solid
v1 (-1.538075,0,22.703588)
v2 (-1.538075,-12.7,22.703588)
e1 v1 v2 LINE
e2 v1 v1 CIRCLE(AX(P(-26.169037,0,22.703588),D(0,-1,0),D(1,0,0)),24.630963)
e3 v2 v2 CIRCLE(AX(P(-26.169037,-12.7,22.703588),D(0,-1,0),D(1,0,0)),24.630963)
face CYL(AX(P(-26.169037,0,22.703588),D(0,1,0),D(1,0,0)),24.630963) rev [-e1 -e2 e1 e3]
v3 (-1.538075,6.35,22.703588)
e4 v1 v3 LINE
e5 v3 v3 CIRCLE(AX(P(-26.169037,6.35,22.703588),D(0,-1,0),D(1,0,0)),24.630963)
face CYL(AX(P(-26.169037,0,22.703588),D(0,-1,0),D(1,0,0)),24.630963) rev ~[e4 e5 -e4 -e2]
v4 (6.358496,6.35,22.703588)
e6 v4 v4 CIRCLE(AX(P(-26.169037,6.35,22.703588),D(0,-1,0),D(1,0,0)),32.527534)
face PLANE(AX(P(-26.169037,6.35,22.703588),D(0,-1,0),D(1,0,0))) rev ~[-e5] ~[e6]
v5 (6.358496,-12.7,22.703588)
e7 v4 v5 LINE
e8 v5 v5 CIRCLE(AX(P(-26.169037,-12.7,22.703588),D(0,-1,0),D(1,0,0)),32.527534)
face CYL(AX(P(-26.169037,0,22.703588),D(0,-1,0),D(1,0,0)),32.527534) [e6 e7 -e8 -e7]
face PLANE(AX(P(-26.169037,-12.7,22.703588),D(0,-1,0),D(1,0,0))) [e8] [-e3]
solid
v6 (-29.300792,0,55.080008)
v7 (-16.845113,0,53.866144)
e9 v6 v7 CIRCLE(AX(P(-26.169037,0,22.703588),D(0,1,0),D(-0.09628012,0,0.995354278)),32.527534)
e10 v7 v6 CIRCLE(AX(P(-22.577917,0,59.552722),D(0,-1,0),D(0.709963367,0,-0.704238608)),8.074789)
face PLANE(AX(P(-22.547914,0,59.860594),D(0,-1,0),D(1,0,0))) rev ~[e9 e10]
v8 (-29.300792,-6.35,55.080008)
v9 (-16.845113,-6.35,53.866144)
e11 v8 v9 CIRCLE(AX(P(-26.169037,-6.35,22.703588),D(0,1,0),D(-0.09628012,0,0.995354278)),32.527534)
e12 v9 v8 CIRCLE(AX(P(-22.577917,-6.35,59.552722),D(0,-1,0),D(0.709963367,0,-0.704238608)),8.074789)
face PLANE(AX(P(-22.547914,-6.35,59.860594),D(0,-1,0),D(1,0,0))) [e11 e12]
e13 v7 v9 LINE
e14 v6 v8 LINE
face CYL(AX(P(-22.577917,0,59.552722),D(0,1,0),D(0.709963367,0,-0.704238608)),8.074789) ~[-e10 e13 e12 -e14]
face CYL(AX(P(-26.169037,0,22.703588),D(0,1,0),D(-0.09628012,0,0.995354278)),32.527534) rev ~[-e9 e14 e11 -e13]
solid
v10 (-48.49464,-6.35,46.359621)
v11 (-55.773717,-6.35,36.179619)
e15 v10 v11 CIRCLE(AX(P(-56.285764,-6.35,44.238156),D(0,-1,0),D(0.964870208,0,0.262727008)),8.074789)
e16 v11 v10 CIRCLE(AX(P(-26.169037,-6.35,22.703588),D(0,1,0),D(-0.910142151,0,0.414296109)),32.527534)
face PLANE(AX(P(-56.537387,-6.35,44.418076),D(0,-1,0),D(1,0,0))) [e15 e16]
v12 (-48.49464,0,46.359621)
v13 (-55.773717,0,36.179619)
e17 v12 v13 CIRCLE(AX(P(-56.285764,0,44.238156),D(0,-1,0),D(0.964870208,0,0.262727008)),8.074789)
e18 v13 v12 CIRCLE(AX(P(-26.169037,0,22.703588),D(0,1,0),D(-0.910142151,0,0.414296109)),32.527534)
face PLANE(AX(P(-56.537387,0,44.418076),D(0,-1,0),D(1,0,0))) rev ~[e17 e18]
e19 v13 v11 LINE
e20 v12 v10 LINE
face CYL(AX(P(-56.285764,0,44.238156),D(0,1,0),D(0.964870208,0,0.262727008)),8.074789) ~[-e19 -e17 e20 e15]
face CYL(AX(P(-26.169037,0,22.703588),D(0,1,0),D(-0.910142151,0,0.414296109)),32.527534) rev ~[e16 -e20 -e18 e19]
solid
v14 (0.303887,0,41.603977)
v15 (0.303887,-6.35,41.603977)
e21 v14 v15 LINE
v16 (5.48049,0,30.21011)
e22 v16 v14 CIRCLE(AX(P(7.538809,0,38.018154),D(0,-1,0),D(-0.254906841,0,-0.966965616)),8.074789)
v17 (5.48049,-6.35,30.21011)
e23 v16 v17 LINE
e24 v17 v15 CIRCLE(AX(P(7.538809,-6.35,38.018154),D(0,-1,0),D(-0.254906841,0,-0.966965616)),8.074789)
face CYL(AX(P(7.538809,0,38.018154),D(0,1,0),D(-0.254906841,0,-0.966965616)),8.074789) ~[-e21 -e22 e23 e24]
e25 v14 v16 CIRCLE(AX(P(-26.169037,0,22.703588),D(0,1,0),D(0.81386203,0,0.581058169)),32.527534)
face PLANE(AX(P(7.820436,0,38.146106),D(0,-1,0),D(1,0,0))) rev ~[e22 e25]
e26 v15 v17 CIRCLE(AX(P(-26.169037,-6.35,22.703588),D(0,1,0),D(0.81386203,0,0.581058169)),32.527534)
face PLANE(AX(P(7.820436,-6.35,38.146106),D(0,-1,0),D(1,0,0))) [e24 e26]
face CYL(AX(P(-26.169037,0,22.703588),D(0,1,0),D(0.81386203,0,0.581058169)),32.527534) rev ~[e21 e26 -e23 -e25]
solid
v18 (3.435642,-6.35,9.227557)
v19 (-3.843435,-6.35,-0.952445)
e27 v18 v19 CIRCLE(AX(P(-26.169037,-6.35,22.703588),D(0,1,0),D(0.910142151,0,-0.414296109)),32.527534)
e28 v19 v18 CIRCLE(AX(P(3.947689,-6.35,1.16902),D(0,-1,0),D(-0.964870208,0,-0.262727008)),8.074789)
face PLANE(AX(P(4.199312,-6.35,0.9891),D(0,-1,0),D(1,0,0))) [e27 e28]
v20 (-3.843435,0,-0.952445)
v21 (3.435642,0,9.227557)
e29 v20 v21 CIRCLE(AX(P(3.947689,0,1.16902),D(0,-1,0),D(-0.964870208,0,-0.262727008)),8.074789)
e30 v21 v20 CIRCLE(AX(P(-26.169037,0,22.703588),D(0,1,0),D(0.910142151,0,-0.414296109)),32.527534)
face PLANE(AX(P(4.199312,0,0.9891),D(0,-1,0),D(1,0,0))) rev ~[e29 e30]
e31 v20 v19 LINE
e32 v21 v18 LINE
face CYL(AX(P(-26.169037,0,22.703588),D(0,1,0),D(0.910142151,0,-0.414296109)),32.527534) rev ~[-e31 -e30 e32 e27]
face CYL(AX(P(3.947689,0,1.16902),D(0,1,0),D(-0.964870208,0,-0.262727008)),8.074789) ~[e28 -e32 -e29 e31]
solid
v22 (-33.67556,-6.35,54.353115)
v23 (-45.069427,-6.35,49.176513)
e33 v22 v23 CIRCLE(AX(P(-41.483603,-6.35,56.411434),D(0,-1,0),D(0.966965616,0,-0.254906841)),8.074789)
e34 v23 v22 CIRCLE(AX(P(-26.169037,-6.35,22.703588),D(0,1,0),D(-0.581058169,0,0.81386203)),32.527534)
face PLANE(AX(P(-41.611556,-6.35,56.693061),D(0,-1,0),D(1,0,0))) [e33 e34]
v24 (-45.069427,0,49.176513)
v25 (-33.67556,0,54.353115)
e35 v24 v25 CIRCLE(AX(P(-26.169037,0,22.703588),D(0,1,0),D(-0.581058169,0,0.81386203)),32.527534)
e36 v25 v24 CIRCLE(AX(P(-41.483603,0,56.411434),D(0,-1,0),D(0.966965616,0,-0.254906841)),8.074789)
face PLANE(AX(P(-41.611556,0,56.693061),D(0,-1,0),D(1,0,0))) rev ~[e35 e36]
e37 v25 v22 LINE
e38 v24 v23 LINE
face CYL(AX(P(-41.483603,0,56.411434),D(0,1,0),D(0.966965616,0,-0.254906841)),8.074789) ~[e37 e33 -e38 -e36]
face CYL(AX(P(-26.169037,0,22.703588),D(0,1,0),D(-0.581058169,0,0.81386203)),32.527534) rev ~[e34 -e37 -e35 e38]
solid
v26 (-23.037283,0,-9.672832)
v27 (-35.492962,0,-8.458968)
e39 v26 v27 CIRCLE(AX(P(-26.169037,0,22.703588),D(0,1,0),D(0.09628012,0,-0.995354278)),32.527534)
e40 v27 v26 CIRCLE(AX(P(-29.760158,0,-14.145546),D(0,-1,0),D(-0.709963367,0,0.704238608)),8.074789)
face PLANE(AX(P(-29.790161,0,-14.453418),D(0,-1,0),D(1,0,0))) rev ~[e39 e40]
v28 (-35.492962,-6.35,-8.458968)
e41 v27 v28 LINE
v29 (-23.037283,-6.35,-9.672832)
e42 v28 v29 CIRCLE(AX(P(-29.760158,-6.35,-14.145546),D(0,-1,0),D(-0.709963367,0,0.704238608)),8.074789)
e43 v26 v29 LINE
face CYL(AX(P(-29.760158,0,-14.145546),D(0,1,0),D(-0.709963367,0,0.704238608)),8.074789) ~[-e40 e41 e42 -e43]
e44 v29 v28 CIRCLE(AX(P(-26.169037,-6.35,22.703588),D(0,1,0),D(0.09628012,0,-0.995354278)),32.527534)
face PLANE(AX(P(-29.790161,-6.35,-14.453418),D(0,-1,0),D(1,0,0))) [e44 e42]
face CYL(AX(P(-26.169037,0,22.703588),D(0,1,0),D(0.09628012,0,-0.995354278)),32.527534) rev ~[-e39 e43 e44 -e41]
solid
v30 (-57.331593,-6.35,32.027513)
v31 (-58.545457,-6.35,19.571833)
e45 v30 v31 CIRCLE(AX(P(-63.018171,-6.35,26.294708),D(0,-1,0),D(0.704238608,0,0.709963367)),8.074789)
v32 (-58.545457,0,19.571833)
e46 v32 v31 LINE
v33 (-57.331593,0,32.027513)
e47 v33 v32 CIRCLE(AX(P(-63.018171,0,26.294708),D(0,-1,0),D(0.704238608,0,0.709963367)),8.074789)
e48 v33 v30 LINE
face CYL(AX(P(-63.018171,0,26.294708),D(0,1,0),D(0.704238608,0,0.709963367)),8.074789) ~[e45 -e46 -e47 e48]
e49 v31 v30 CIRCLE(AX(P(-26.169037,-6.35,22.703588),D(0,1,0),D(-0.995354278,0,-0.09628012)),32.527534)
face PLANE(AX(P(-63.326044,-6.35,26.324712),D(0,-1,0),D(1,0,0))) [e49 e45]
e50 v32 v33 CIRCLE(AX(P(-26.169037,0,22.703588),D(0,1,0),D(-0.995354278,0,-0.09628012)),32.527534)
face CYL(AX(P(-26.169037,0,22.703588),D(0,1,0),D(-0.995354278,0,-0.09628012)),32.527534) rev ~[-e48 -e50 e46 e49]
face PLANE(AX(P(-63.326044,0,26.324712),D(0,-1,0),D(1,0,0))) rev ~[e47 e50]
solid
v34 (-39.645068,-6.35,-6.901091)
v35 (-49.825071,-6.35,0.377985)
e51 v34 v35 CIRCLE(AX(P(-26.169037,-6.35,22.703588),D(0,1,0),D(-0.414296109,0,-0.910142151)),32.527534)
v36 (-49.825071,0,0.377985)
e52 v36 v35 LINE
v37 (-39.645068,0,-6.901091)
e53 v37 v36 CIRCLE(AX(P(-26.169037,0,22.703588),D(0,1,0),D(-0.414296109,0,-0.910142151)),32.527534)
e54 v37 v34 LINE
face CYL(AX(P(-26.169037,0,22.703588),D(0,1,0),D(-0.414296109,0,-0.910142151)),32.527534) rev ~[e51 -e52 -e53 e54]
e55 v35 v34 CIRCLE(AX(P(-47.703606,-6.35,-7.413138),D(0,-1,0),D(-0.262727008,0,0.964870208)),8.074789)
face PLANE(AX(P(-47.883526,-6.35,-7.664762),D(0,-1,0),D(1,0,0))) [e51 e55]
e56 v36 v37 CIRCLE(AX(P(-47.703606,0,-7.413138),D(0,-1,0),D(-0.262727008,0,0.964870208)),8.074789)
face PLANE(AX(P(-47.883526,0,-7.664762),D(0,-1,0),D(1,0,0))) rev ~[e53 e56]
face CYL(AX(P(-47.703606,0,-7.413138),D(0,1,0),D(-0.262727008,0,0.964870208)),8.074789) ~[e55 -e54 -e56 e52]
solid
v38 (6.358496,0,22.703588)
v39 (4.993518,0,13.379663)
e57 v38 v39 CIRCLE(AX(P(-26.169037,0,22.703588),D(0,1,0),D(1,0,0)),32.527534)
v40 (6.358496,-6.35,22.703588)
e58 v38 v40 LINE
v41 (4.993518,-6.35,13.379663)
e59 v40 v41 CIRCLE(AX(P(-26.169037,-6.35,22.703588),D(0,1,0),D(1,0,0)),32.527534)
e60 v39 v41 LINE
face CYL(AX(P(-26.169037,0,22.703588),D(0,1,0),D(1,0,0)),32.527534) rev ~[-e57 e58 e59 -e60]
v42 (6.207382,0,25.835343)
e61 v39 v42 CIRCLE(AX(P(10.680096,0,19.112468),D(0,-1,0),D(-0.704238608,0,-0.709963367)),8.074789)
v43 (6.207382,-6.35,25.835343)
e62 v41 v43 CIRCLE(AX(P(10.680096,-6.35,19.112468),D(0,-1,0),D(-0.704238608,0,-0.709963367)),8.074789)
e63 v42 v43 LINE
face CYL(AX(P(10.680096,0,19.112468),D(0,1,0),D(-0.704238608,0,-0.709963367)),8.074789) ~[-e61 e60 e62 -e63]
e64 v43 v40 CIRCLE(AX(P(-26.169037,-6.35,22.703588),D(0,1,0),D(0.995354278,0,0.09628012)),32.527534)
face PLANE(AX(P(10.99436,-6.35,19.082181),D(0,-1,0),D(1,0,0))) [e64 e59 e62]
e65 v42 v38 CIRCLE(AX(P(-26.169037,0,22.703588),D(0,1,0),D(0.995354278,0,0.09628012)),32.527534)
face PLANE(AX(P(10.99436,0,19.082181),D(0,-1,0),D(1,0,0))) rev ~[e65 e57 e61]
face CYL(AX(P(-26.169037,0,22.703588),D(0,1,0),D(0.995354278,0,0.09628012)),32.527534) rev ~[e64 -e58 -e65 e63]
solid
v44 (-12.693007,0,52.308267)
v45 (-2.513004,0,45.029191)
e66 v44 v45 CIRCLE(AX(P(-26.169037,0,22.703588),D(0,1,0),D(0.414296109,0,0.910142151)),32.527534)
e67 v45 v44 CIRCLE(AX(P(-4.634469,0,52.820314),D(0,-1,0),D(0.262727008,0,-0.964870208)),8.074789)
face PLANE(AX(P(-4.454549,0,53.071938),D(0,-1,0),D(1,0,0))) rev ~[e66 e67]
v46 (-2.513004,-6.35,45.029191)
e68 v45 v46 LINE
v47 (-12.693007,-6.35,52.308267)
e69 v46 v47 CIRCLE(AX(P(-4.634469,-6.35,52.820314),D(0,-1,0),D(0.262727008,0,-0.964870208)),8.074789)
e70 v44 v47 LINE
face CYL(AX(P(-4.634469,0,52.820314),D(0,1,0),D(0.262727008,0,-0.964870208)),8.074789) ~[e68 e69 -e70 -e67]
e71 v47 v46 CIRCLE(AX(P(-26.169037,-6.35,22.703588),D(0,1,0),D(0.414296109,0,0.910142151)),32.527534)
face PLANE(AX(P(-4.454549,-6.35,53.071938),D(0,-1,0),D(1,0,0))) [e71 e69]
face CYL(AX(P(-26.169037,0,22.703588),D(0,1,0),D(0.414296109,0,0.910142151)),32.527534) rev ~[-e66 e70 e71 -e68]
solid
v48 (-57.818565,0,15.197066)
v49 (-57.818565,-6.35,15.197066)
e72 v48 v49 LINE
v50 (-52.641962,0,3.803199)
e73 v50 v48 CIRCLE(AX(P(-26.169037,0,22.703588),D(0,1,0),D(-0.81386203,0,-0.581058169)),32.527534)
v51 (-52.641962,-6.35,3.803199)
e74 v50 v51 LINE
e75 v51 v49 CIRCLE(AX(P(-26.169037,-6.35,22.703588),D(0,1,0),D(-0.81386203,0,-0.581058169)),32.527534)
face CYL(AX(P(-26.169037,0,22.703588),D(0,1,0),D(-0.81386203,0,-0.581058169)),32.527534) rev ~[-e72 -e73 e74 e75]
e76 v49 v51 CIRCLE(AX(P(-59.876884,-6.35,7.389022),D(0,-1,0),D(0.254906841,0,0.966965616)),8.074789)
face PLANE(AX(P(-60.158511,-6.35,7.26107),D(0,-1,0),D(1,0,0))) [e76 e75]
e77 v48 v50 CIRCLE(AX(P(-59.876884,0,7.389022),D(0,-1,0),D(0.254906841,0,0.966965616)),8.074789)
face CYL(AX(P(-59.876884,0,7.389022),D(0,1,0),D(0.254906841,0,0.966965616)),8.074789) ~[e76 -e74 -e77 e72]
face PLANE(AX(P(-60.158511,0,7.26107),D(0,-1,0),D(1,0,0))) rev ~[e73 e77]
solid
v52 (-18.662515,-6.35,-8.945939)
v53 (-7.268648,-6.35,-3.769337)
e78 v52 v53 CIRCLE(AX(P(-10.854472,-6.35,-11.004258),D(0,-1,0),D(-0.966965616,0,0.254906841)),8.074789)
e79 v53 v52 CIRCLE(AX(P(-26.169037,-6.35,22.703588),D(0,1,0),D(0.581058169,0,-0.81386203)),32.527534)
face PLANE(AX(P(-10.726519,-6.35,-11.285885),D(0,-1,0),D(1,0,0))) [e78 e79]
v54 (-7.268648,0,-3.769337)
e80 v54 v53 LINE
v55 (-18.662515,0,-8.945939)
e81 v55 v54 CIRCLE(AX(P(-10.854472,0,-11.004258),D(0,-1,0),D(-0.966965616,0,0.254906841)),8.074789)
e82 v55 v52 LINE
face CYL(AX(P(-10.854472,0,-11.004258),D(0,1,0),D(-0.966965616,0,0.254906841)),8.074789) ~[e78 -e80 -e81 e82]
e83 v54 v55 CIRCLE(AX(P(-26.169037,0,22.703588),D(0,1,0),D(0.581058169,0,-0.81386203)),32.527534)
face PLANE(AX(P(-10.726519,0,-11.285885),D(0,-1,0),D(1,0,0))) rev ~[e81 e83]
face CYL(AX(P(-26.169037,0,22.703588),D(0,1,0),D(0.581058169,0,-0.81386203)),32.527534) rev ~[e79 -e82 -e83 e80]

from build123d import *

# Parameters (mm, degrees)
F3_DEPTH      = 6.35
F4_R          = 32.5275336584
F4_R_2        = 24.6309625536
F5_DEPTH      = 12.7
F5_DEPTH_BACK = 6.35


# Not quite as in the source:
# - the program builds the solid bodies; features that only make, move or delete a surface that nothing else refers to are left out


with BuildPart() as f3:
    # F2 (on Front) → F3 (new body)
    with BuildSketch(Plane.XZ):
        with BuildLine():
            ThreePointArc((-57.3315931421, 32.0275125267), (-71.0548866609, 27.0779234756), (-58.5454572214, 19.5718331568))
            ThreePointArc((-58.5454572214, 19.5718331568), (-58.5431990279, 25.8586011297), (-57.3315931421, 32.0275125267))
        make_face()
    extrude(amount=F3_DEPTH)


with BuildPart() as f3b:
    # F2 (on Front) → F3, piece 2 (new body)
    with BuildSketch(Plane.XZ):
        with BuildLine():
            ThreePointArc((-48.4946400668, 46.3596213521), (-62.8541554032, 48.934798255), (-55.7737168812, 36.179618636))
            ThreePointArc((-55.7737168812, 36.179618636), (-52.6283772418, 41.6229903116), (-48.4946400668, 46.3596213521))
        make_face()
    extrude(amount=F3_DEPTH)


with BuildPart() as f3c:
    # F2 (on Front) → F3, piece 3 (new body)
    with BuildSketch(Plane.XZ):
        with BuildLine():
            ThreePointArc((-33.6755597989, 54.3531151471), (-44.8236764147, 63.7630414325), (-45.0694265942, 49.1765125916))
            ThreePointArc((-45.0694265942, 49.1765125916), (-39.6237967252, 52.3179409251), (-33.6755597989, 54.3531151471))
        make_face()
    extrude(amount=F3_DEPTH)


with BuildPart() as f3d:
    # F2 (on Front) → F3, piece 4 (new body)
    with BuildSketch(Plane.XZ):
        with BuildLine():
            ThreePointArc((-16.8451129286, 53.8661437046), (-21.7947019796, 67.5894372234), (-29.3007922985, 55.0800077839))
            ThreePointArc((-29.3007922985, 55.0800077839), (-23.0140243255, 55.0777495904), (-16.8451129286, 53.8661437046))
        make_face()
    extrude(amount=F3_DEPTH)


with BuildPart() as f3e:
    # F2 (on Front) → F3, piece 5 (new body)
    with BuildSketch(Plane.XZ):
        with BuildLine():
            ThreePointArc((-2.5130041032, 45.0291906293), (0.0621727998, 59.3887059657), (-12.6930068192, 52.3082674437))
            ThreePointArc((-12.6930068192, 52.3082674437), (-7.2496351437, 49.1629278043), (-2.5130041032, 45.0291906293))
        make_face()
    extrude(amount=F3_DEPTH)


with BuildPart() as f3f:
    # F2 (on Front) → F3, piece 6 (new body)
    with BuildSketch(Plane.XZ):
        with BuildLine():
            ThreePointArc((5.4804896918, 30.2101103614), (14.8904159772, 41.3582269772), (0.3038871363, 41.6039771567))
            ThreePointArc((0.3038871363, 41.6039771567), (3.4453154699, 36.1583472877), (5.4804896918, 30.2101103614))
        make_face()
    extrude(amount=F3_DEPTH)


with BuildPart() as f3g:
    # F2 (on Front) → F3, piece 7 (new body)
    with BuildSketch(Plane.XZ):
        with BuildLine():
            ThreePointArc((6.3584962121, 22.7035880089), (6.0154427046, 17.9919340198), (4.9935182493, 13.3796634911))
            ThreePointArc((4.9935182493, 13.3796634911), (18.7168117681, 18.3292525421), (6.2073823286, 25.835342861))
            ThreePointArc((6.2073823286, 25.835342861), (6.3206957771, 24.2712872673), (6.3584962121, 22.7035880089))
        make_face()
    extrude(amount=F3_DEPTH)


with BuildPart() as f3h:
    # F2 (on Front) → F3, piece 8 (new body)
    with BuildSketch(Plane.XZ):
        with BuildLine():
            ThreePointArc((3.4356419884, 9.2275573817), (0.290302349, 3.7841857062), (-3.843434826, -0.9524453343))
            ThreePointArc((-3.843434826, -0.9524453343), (10.5160805105, -3.5276222373), (3.4356419884, 9.2275573817))
        make_face()
    extrude(amount=F3_DEPTH)


with BuildPart() as f3i:
    # F2 (on Front) → F3, piece 9 (new body)
    with BuildSketch(Plane.XZ):
        with BuildLine():
            ThreePointArc((-23.0372825943, -9.6728317661), (-29.3240505672, -9.6705735727), (-35.4929619642, -8.4589676868))
            ThreePointArc((-35.4929619642, -8.4589676868), (-30.5433729131, -22.1822612056), (-23.0372825943, -9.6728317661))
        make_face()
    extrude(amount=F3_DEPTH)


with BuildPart() as f3j:
    # F2 (on Front) → F3, piece 10 (new body)
    with BuildSketch(Plane.XZ):
        with BuildLine():
            ThreePointArc((-7.2686482985, -3.7693365738), (-12.7142781676, -6.9107649074), (-18.6625150939, -8.9459391293))
            ThreePointArc((-18.6625150939, -8.9459391293), (-7.514398478, -18.3558654147), (-7.2686482985, -3.7693365738))
        make_face()
    extrude(amount=F3_DEPTH)


with BuildPart() as f3k:
    # F2 (on Front) → F3, piece 11 (new body)
    with BuildSketch(Plane.XZ):
        with BuildLine():
            ThreePointArc((-39.6450680735, -6.9010914259), (-45.0884397491, -3.7557517865), (-49.8250707896, 0.3779853885))
            ThreePointArc((-49.8250707896, 0.3779853885), (-52.4002476925, -13.981529948), (-39.6450680735, -6.9010914259))
        make_face()
    extrude(amount=F3_DEPTH)


with BuildPart() as f3l:
    # F2 (on Front) → F3, piece 12 (new body)
    with BuildSketch(Plane.XZ):
        with BuildLine():
            ThreePointArc((-52.6419620291, 3.803198861), (-55.7833903626, 9.2488287301), (-57.8185645846, 15.1970656564))
            ThreePointArc((-57.8185645846, 15.1970656564), (-67.22849087, 4.0489490405), (-52.6419620291, 3.803198861))
        make_face()
    extrude(amount=F3_DEPTH)


with BuildPart() as f5:
    # F4 (on Front) → F5 (new body, two sides)
    with BuildSketch(Plane.XZ) as f5_sk:
        with Locations((-26.1690374464, 22.7035880089)):
            Circle(F4_R)
        with Locations((-26.1690374464, 22.7035880089)):
            Circle(F4_R_2, mode=Mode.SUBTRACT)
    extrude(amount=F5_DEPTH)
    extrude(f5_sk.sketch, amount=-F5_DEPTH_BACK)


solid = Compound([f3.part, f3b.part, f3c.part, f3d.part, f3e.part, f3f.part, f3g.part, f3h.part, f3i.part, f3j.part, f3k.part, f3l.part, f5.part])
